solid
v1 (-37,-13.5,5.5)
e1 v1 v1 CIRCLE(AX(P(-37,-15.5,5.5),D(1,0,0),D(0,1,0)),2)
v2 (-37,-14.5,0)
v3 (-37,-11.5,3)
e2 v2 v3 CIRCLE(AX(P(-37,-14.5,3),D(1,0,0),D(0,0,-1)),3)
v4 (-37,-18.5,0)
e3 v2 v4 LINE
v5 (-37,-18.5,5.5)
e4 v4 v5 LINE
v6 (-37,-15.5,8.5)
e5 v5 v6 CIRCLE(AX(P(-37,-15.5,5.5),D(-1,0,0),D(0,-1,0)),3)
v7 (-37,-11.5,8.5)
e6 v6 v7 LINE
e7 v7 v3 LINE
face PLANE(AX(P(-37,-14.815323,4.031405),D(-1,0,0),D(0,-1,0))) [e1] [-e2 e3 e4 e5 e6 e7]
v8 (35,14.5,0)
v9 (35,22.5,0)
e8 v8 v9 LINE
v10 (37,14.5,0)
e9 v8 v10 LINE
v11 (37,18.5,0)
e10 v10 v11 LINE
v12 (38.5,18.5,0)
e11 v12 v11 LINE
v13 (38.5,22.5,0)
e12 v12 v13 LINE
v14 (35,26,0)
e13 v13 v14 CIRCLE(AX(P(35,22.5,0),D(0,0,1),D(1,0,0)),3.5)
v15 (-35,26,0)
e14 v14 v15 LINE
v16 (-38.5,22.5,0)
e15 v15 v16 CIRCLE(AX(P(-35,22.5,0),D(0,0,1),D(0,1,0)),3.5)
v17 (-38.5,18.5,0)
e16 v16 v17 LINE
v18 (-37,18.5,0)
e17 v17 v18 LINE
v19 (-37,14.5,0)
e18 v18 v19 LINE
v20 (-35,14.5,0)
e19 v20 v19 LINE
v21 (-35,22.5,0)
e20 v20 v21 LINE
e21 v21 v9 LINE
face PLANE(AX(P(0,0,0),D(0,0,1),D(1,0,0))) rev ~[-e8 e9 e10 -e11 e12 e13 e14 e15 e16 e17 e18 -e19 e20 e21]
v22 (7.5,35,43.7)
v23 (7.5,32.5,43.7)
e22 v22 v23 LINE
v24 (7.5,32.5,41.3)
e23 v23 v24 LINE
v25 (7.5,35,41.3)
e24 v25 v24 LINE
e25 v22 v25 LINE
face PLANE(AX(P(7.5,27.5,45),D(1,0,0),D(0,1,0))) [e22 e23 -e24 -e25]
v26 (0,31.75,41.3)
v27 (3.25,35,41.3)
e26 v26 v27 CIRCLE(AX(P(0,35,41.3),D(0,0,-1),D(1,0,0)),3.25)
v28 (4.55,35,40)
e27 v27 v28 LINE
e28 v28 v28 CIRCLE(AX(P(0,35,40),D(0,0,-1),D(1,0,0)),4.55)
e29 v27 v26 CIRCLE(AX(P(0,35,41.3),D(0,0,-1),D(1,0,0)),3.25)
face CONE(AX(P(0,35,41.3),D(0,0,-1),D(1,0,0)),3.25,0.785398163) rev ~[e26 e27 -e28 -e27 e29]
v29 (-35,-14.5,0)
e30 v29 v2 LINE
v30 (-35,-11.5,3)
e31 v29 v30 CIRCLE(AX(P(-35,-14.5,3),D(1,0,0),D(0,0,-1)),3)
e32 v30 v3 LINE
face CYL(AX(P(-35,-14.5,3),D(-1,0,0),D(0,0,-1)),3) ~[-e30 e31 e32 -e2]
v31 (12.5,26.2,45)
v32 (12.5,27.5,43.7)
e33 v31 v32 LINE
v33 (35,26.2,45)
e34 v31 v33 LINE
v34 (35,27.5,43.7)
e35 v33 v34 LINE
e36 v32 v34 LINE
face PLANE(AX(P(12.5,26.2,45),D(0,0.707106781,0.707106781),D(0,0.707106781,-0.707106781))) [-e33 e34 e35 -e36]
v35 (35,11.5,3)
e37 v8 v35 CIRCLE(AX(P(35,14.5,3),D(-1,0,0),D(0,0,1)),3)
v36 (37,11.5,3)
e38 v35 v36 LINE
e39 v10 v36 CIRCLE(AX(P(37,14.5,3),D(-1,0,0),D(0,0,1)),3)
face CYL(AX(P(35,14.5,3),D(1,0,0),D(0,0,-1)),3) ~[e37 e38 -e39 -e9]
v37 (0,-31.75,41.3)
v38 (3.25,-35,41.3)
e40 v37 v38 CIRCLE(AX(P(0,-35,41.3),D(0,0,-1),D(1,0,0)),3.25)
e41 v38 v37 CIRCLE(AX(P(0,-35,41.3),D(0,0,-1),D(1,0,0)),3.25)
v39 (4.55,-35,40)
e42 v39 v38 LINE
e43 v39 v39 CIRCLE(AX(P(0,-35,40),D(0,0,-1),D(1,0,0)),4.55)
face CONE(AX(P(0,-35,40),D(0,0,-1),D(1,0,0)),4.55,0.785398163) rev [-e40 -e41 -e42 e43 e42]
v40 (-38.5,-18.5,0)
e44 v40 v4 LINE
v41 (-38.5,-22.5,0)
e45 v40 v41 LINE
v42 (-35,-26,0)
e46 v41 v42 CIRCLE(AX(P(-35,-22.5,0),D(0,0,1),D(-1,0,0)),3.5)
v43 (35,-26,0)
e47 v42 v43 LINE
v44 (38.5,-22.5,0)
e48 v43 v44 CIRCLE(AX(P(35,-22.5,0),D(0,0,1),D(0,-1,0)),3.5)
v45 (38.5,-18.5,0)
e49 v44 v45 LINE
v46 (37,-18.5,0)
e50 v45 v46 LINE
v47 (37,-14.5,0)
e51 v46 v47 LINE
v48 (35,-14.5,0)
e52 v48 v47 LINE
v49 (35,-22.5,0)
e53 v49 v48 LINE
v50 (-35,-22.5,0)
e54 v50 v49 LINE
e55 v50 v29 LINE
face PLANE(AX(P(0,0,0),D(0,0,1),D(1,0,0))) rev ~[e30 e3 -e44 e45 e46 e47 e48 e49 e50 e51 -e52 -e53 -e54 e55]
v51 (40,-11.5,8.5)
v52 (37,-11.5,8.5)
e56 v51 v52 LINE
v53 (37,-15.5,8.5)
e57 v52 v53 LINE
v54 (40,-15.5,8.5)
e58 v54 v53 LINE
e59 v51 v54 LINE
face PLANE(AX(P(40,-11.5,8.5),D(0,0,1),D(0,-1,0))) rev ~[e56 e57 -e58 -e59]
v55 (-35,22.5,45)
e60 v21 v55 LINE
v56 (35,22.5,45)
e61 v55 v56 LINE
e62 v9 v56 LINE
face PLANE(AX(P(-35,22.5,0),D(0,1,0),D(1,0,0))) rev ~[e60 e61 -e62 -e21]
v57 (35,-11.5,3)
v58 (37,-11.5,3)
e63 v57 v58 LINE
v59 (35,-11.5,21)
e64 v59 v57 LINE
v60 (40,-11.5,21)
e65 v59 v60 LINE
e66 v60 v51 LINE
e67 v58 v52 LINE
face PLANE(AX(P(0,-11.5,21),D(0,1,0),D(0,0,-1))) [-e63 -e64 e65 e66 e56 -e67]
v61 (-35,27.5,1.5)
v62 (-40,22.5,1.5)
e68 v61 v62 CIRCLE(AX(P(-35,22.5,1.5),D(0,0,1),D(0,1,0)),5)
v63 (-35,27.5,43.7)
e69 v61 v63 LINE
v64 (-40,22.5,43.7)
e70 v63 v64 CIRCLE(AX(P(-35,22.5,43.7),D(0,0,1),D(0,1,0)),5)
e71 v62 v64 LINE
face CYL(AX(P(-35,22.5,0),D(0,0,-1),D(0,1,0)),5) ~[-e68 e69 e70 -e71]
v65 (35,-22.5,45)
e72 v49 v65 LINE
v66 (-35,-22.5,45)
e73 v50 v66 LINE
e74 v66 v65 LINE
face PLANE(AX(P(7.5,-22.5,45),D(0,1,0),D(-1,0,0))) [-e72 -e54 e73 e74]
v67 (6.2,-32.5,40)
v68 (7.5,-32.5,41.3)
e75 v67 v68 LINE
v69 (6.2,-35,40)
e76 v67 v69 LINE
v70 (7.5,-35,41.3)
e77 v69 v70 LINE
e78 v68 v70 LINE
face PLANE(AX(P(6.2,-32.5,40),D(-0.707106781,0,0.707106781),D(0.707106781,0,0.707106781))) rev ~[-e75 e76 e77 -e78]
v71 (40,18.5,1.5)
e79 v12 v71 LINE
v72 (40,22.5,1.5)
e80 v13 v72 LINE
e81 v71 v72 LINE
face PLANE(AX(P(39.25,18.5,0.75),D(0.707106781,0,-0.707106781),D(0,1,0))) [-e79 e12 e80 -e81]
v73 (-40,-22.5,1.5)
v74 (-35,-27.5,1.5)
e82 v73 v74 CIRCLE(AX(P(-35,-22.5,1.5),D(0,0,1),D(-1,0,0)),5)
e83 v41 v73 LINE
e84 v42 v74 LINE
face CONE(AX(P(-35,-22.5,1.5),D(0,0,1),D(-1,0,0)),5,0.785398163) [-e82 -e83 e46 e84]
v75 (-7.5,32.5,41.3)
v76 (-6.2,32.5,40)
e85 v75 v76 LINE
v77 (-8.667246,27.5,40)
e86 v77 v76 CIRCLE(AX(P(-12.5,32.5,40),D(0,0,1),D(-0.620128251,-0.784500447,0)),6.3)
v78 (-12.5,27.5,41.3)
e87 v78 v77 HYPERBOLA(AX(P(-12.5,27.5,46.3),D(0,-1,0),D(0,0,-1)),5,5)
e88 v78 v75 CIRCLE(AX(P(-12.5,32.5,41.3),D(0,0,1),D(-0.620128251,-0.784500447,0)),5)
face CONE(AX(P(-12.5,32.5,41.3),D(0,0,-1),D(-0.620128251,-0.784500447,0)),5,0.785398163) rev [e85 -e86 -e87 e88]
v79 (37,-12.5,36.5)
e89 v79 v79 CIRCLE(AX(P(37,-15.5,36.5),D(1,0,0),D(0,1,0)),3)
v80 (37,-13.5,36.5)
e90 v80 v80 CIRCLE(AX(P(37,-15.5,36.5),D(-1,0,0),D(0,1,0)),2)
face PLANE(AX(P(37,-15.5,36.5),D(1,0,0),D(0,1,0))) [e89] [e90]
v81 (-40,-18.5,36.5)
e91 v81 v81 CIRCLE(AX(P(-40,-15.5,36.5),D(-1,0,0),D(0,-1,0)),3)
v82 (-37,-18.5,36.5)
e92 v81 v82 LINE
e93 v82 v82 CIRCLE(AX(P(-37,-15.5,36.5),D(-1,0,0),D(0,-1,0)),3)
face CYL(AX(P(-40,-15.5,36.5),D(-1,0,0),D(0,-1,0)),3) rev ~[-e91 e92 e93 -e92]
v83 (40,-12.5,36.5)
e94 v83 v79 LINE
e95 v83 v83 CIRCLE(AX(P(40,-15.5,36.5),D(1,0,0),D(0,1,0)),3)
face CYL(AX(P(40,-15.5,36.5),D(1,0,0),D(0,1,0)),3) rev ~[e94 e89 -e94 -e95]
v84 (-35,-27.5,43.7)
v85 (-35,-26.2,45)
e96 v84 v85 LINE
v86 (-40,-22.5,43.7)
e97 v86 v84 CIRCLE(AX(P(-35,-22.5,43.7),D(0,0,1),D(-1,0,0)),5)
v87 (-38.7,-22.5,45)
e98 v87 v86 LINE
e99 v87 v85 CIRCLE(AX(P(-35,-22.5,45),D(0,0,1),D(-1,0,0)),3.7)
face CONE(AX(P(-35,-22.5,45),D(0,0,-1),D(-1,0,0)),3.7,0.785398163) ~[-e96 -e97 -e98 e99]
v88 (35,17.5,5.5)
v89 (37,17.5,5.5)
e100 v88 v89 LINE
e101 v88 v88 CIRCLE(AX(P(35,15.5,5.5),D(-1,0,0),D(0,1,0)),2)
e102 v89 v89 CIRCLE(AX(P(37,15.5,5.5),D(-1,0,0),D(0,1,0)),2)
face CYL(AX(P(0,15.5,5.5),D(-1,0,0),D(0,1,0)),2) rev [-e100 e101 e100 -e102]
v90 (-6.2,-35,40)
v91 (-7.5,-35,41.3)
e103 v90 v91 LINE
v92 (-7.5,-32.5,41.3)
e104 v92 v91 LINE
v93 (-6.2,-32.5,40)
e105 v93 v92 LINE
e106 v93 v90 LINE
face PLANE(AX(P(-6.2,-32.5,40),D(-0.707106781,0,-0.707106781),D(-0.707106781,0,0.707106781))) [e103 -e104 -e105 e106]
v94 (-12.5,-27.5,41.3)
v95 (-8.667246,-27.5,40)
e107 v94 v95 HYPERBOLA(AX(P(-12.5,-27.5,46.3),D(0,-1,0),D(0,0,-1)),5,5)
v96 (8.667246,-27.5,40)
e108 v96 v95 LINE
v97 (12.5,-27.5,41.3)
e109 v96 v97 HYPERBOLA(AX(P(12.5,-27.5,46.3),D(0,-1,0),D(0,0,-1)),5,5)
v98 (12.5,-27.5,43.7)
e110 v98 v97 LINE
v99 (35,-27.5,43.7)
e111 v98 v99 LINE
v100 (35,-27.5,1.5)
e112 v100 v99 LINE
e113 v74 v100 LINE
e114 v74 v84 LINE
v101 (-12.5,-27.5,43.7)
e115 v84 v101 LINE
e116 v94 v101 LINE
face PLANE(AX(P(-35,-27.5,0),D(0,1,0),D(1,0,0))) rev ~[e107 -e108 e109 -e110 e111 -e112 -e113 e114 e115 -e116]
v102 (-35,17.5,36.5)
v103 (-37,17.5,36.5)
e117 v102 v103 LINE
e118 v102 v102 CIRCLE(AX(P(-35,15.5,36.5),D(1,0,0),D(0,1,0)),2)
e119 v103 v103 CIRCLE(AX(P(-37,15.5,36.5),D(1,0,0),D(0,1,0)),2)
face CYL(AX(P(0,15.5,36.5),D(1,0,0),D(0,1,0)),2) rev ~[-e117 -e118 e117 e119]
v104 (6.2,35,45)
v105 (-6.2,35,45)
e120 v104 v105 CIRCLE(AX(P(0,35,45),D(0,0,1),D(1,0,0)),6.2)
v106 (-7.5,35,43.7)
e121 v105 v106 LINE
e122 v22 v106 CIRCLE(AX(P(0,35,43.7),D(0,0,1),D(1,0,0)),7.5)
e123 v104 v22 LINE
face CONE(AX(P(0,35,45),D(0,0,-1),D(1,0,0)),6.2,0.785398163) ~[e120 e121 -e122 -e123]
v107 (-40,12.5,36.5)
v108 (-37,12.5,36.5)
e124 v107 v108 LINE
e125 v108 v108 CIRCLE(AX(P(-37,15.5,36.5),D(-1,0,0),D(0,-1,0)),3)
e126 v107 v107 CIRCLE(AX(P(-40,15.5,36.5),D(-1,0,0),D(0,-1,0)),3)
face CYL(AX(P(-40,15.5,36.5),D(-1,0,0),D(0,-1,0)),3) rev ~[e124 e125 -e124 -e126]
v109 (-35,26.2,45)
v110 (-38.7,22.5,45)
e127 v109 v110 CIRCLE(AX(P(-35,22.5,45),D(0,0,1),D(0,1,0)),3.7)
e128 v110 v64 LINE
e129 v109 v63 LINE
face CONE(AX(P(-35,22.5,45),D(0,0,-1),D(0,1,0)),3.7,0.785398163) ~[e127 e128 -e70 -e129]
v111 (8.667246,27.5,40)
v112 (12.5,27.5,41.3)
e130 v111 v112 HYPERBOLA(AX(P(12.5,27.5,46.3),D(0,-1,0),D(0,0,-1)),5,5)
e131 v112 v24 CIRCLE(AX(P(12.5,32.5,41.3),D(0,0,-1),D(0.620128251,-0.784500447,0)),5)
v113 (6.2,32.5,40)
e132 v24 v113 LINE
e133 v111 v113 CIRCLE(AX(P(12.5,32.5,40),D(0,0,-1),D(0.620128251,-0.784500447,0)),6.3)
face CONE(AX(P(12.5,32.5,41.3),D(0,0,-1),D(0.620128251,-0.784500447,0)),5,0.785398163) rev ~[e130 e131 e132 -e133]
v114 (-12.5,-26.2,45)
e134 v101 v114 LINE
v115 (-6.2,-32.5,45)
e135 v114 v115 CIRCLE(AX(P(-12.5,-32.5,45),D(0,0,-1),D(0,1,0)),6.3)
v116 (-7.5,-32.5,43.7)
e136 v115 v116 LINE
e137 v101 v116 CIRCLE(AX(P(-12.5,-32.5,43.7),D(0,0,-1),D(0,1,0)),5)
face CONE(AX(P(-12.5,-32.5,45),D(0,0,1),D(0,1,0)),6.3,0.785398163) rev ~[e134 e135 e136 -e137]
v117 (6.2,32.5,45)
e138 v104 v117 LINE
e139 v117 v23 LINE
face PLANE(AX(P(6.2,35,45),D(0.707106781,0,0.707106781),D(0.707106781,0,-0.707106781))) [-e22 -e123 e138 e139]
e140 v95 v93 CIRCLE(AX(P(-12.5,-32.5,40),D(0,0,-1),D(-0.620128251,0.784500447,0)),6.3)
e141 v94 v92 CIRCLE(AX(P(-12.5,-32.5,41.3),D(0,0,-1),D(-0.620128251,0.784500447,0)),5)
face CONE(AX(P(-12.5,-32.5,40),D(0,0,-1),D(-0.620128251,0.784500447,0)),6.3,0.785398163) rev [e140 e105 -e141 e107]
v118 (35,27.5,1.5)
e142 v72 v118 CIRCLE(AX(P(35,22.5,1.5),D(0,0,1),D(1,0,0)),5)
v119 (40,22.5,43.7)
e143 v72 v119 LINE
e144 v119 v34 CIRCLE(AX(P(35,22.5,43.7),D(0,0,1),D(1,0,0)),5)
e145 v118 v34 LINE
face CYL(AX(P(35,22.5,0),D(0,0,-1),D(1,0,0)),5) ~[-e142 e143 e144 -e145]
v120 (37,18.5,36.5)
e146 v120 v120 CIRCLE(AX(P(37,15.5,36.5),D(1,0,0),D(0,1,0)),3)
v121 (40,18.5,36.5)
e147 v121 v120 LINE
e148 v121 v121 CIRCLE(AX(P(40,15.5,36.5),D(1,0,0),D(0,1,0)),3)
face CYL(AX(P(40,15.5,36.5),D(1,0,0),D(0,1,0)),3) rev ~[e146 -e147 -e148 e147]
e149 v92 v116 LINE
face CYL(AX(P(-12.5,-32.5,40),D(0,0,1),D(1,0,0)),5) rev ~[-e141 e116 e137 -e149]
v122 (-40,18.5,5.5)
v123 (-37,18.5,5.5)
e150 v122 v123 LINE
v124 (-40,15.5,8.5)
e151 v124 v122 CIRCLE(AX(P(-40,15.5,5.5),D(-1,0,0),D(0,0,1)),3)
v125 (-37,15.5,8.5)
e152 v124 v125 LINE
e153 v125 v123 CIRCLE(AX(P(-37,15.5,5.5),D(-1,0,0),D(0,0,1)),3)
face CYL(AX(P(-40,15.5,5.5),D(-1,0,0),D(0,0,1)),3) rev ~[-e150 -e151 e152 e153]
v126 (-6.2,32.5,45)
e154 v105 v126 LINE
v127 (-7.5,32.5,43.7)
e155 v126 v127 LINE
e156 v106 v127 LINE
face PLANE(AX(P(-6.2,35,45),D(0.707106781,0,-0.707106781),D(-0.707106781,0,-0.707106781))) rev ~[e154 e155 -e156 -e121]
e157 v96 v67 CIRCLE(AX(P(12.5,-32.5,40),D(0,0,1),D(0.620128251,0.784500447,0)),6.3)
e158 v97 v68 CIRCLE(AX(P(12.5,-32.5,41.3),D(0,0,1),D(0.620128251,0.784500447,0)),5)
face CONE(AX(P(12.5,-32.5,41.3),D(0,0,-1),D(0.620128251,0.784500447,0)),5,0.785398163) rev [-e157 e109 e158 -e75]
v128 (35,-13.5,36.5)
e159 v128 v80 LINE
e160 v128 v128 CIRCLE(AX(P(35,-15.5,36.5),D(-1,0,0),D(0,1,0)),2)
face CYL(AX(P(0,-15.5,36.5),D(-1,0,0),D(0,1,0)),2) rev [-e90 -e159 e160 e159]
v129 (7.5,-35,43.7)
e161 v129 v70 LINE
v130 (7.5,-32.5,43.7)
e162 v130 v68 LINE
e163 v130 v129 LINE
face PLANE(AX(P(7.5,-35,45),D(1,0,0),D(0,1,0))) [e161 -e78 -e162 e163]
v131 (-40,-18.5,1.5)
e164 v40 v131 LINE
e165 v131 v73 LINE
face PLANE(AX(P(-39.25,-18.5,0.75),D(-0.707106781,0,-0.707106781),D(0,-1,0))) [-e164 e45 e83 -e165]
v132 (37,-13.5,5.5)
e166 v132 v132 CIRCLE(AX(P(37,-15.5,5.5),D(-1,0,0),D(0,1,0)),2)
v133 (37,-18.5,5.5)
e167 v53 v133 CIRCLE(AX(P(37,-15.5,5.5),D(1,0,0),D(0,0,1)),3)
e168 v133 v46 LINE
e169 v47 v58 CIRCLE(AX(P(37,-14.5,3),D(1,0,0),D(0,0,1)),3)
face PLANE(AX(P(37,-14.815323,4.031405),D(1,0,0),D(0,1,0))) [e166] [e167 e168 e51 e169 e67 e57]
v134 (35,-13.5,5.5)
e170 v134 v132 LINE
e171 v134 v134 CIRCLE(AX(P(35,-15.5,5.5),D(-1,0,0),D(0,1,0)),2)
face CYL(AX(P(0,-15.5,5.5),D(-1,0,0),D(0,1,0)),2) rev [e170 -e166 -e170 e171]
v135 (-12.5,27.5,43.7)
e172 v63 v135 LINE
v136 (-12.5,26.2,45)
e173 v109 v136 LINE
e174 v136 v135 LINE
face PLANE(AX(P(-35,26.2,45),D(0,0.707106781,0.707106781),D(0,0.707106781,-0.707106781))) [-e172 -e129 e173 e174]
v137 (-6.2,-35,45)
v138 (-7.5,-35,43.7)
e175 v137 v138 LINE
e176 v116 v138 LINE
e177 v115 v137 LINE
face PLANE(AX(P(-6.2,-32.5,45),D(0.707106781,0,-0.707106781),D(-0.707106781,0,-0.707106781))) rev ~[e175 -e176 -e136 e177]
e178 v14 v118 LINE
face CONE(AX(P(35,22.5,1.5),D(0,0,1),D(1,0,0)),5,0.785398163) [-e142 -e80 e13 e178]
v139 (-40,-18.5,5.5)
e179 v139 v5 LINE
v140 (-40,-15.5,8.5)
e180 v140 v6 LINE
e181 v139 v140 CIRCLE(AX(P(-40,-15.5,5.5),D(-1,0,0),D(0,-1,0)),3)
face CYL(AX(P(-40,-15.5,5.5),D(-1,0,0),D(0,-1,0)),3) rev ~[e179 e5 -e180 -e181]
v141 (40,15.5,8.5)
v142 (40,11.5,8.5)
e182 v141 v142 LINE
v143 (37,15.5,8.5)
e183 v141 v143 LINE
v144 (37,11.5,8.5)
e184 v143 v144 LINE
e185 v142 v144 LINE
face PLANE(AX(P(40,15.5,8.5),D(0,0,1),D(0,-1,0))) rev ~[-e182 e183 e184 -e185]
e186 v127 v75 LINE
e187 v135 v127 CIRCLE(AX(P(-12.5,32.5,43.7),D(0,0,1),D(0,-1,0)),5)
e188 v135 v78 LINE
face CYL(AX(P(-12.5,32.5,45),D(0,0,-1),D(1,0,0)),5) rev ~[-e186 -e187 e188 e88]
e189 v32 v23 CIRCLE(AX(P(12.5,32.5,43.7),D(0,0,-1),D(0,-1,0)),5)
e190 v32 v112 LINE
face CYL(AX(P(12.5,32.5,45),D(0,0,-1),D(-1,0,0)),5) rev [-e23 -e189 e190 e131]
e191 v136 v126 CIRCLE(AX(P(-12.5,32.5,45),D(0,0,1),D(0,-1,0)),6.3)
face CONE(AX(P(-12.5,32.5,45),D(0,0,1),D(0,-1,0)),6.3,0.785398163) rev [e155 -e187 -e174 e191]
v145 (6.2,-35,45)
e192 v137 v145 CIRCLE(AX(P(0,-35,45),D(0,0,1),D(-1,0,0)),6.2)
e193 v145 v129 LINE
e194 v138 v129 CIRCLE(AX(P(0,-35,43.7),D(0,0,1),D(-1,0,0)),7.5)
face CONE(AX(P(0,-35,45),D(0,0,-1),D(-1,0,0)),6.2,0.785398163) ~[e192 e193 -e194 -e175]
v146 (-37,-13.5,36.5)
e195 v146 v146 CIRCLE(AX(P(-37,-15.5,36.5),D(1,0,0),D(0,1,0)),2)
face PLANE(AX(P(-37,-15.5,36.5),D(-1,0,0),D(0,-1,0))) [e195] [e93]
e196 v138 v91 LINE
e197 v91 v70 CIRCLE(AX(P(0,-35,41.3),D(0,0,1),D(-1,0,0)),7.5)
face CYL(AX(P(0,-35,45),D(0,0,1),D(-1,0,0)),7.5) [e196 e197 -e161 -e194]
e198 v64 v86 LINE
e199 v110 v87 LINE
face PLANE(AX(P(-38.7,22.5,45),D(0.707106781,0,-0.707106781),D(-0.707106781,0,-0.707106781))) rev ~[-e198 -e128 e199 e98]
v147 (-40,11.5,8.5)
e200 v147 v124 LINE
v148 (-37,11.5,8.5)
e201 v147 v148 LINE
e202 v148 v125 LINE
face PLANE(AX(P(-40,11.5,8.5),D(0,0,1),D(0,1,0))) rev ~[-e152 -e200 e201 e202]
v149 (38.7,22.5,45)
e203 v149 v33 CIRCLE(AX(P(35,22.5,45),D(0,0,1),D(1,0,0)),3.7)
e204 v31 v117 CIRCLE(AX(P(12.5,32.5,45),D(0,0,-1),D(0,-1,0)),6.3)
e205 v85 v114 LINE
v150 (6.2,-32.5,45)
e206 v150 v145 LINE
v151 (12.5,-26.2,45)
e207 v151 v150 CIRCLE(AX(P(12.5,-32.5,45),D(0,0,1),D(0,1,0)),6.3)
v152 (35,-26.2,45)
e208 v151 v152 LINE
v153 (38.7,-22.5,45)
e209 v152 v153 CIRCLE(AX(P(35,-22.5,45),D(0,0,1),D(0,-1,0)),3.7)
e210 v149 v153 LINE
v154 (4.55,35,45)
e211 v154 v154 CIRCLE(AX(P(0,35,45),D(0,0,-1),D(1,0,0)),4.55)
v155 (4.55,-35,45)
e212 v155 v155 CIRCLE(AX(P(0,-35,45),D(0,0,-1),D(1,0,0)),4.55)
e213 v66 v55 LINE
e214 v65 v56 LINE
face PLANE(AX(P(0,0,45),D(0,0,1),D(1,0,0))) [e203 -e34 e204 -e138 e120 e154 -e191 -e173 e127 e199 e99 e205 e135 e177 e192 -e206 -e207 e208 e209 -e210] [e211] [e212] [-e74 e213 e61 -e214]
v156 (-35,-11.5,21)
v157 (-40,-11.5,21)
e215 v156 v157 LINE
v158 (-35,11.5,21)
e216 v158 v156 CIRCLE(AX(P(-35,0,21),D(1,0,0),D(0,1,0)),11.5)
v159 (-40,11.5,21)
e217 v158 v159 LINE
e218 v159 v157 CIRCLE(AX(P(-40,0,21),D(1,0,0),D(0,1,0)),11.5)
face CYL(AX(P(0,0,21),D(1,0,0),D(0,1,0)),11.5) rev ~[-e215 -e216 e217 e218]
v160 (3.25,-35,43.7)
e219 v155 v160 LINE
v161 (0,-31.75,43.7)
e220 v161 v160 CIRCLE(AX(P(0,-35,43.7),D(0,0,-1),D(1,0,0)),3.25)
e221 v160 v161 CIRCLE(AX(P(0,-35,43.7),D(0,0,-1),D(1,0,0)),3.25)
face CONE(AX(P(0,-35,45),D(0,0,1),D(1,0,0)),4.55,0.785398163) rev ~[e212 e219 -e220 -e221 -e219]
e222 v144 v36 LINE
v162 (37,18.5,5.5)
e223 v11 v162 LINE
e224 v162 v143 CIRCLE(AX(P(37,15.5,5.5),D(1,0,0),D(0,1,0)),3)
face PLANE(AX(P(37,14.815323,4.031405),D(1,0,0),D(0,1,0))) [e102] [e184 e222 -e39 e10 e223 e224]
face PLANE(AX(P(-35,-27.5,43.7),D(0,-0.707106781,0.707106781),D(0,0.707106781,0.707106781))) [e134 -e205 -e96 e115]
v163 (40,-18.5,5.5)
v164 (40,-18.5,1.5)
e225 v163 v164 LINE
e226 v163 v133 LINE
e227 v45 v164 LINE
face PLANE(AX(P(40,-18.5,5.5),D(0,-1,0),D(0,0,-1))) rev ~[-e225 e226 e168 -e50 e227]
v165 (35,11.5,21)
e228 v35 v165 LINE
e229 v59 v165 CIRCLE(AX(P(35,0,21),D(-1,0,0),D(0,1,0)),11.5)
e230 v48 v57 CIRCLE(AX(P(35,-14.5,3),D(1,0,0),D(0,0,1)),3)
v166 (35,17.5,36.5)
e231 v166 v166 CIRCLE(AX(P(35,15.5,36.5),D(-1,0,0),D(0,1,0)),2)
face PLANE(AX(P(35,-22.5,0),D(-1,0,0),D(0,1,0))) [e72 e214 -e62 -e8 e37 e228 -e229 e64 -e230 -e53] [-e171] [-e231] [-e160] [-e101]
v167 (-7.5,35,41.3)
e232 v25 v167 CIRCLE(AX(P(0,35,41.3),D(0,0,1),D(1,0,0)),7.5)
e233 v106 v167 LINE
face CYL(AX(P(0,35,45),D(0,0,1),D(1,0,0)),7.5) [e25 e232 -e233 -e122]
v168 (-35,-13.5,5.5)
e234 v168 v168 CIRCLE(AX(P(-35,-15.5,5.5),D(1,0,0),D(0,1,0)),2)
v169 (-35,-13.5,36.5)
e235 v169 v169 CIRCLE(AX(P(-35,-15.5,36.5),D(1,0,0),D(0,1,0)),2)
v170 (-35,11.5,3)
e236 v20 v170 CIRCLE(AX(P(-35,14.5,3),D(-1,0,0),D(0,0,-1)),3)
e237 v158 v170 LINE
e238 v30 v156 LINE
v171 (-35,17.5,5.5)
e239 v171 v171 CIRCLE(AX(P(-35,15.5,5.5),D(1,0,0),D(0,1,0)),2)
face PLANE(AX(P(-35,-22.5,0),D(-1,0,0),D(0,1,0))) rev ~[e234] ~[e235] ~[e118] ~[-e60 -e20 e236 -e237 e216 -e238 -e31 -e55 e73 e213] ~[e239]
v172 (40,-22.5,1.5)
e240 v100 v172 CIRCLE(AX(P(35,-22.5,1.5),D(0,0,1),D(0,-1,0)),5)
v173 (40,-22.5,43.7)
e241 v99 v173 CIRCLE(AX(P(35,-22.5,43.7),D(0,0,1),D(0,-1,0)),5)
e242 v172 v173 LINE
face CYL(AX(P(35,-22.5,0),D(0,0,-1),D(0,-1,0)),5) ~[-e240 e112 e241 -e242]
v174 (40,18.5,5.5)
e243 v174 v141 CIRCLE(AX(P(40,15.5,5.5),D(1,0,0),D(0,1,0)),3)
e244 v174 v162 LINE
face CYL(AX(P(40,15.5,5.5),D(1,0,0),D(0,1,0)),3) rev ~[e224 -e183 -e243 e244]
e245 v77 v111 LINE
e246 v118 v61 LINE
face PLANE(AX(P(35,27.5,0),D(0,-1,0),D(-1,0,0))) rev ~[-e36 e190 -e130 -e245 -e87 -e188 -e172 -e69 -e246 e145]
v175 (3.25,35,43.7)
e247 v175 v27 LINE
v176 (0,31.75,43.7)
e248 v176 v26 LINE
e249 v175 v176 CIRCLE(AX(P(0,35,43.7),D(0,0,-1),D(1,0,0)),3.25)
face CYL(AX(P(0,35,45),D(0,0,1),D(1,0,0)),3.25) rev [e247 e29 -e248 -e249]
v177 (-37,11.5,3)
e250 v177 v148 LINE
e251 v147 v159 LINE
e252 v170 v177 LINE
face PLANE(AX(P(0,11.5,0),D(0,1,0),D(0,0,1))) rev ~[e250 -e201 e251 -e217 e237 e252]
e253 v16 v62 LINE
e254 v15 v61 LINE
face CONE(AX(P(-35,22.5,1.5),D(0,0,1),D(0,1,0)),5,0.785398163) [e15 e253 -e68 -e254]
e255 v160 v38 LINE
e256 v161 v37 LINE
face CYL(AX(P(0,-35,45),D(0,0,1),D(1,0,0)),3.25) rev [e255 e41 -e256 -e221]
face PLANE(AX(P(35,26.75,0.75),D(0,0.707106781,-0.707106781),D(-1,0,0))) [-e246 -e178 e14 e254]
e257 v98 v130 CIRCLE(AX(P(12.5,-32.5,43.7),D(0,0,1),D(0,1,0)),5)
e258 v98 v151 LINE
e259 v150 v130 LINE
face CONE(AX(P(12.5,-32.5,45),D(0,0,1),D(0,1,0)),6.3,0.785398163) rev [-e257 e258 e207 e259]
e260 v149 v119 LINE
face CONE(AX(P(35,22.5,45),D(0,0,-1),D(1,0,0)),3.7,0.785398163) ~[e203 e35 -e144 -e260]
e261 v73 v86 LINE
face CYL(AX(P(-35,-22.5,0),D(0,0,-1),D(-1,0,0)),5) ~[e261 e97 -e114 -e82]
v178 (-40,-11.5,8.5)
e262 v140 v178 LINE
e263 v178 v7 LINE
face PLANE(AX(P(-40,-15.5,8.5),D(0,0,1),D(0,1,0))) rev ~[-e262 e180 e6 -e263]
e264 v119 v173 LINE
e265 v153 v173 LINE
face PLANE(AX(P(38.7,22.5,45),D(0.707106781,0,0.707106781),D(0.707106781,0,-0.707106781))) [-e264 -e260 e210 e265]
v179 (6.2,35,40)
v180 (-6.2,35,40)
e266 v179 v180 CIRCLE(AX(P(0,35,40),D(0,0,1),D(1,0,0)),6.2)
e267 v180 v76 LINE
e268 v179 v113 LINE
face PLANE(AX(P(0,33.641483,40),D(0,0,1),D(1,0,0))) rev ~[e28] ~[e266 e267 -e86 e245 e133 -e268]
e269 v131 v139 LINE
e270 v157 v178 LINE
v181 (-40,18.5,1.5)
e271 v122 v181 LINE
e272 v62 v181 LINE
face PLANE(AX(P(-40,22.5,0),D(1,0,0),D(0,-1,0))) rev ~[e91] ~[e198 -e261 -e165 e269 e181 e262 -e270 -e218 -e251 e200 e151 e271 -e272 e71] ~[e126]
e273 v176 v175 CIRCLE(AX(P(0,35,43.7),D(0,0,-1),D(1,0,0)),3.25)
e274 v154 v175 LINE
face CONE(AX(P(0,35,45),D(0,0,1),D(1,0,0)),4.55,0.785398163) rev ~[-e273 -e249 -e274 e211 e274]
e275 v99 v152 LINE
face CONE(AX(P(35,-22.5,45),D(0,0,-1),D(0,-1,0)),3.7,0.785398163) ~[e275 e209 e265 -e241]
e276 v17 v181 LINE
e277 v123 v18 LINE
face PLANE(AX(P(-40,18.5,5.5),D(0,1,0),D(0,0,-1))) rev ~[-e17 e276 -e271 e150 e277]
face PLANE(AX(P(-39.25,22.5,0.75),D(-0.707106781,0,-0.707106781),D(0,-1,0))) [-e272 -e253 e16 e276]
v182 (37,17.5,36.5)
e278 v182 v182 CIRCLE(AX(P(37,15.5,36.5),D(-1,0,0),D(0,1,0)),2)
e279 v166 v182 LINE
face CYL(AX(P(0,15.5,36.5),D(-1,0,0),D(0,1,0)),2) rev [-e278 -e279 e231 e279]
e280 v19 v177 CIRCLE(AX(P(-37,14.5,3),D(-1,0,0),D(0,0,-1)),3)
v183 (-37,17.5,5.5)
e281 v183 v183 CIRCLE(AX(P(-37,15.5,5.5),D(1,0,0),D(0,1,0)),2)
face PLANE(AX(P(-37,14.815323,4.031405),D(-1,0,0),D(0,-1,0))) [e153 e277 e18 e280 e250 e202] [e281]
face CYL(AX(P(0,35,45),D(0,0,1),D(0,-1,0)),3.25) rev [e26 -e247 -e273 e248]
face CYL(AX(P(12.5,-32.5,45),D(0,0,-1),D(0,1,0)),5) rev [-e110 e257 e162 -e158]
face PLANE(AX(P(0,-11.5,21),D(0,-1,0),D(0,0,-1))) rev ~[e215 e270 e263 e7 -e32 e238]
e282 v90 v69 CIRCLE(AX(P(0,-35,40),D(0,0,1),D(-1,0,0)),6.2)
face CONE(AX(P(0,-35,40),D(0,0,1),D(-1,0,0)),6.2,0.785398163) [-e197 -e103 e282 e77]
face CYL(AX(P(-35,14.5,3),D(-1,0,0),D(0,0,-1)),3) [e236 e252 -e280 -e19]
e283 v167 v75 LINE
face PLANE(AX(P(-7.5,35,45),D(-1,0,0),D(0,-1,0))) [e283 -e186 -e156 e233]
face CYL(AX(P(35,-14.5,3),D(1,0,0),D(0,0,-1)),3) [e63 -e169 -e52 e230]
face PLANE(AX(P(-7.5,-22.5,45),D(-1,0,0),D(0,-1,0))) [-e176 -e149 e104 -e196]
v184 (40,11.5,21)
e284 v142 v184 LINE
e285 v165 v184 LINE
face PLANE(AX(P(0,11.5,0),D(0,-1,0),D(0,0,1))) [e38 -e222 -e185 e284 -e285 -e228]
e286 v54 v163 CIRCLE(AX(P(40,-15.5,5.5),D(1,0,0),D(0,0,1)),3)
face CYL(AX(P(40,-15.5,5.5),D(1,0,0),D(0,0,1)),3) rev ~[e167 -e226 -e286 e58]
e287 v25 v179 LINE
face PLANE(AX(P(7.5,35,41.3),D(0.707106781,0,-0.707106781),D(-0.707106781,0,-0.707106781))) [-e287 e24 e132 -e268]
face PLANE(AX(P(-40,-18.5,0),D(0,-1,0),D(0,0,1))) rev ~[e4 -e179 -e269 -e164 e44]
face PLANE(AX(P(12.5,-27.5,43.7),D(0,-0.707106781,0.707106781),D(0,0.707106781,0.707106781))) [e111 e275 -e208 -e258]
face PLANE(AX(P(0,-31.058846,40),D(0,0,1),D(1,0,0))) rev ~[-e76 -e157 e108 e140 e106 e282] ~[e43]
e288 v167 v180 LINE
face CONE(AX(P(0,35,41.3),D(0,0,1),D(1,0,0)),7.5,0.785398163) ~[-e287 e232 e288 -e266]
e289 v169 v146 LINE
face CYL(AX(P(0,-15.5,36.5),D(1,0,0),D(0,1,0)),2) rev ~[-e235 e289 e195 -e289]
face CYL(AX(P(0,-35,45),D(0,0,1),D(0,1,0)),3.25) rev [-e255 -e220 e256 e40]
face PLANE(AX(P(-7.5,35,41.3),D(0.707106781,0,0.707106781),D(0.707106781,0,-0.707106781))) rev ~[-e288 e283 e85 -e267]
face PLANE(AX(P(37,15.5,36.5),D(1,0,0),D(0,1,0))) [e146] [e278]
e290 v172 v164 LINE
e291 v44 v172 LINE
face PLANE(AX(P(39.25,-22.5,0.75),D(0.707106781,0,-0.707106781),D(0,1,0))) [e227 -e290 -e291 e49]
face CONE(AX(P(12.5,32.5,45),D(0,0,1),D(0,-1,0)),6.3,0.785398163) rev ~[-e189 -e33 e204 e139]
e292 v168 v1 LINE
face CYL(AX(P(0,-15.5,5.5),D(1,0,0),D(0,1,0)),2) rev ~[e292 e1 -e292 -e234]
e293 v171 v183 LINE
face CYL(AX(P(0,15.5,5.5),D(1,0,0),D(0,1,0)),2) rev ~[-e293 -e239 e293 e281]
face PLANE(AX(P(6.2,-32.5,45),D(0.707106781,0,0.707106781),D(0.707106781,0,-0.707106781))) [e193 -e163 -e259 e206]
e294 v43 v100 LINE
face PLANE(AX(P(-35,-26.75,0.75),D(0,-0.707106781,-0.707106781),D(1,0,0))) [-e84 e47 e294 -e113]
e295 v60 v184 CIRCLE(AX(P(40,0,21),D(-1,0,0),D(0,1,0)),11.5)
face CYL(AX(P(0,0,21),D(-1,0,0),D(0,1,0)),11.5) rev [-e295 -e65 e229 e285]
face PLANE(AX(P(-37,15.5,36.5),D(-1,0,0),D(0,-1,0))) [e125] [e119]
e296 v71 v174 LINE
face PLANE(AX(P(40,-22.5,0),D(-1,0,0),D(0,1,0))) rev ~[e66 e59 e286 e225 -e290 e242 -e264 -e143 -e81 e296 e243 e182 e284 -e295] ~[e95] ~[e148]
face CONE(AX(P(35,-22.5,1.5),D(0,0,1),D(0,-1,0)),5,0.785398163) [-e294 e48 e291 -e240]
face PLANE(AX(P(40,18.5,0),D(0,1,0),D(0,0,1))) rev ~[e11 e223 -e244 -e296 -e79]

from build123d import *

# Parameters (mm, degrees)
F0_W          = 70
F0_H          = 45
F1_DEPTH      = 45
F2_R          = 2
F3_DEPTH      = 40.001
F3_DEPTH_BACK = 40.001
F5_R          = 3
F6_DEPTH      = 3
F7_R          = 3
F8_DEPTH      = 3
F9_R          = 3
F10_SIZE      = 1.5
F12_DEPTH     = 5
F13_R         = 5
F14_T1_DEPTH  = 22.5
F14_T3_DEPTH  = 22.5
F14_T5_DEPTH  = 2.5
F14_T7_DEPTH  = 45
F14_T9_DEPTH  = 2.5
F14_T16_ANGLE = 180
F14_T22_ANGLE = 128.3255006626
F14_T27_ANGLE = 90
F14_T29_ANGLE = 90
F14_T31_ANGLE = 180
F14_T33_ANGLE = 90
F14_T35_ANGLE = 90
F14_T37_ANGLE = 90
F14_T39_ANGLE = 90
F14_T41_ANGLE = 180
F14_T43_ANGLE = 90
F14_T45_ANGLE = 90
F14_T49_ANGLE = 128.3255006626
F14_T52_ANGLE = 180
F14_T56_ANGLE = 128.3255006626
F14_T61_ANGLE = 128.3255006626


# Not quite as in the source:
# - a fillet or chamfer that OpenCascade refuses, or shapes differently, is made with other operations: its cross-section is extruded or revolved along the edge and cut away or added


with BuildPart() as f1:
    # F0 (on Top) → F1 (new body)
    with BuildSketch(Plane.XY):
        with BuildLine():
            ThreePointArc((40, 22.5), (38.5355339059, 26.0355339059), (35, 27.5))
            Line((35, 27.5), (-35, 27.5))
            ThreePointArc((-35, 27.5), (-38.5355339059, 26.0355339059), (-40, 22.5))
            Line((-40, 22.5), (-40, -22.5))
            ThreePointArc((-40, -22.5), (-38.5355339059, -26.0355339059), (-35, -27.5))
            Line((-35, -27.5), (35, -27.5))
            ThreePointArc((35, -27.5), (38.5355339059, -26.0355339059), (40, -22.5))
            Line((40, -22.5), (40, 22.5))
        make_face()
        Rectangle(F0_W, F0_H, mode=Mode.SUBTRACT)
    extrude(amount=F1_DEPTH)

    # F2 (on Right) → F3 (cut, two sides)
    with BuildSketch(Plane.YZ) as f3_sk:
        with Locations((15.5, 36.5)):
            Circle(F2_R)
        with Locations((-15.5, 36.5)):
            Circle(F2_R)
        with Locations((15.5, 5.5)):
            Circle(F2_R)
        with Locations((-15.5, 5.5)):
            Circle(F2_R)
        with BuildLine():
            Line((11.5, 0), (11.5, 21))
            ThreePointArc((11.5, 21), (0, 32.5), (-11.5, 21))
            Line((-11.5, 21), (-11.5, 0))
            Line((-11.5, 0), (11.5, 0))
        make_face()
    extrude(amount=-F3_DEPTH, mode=Mode.SUBTRACT)
    extrude(f3_sk.sketch, amount=F3_DEPTH_BACK, mode=Mode.SUBTRACT)

    # F5 (on face) → F6 (cut)
    with BuildSketch(Plane.YZ.offset(40)):
        with Locations((-15.5, 36.5)):
            Circle(F5_R)
        with Locations((15.5, 36.5)):
            Circle(F5_R)
        with BuildLine():
            ThreePointArc((-15.5, 8.5), (-17.6213203436, 7.6213203436), (-18.5, 5.5))
            Line((-18.5, 5.5), (-18.5, 0))
            Line((-18.5, 0), (-11.5, 0))
            Line((-11.5, 0), (-11.5, 8.5))
            Line((-11.5, 8.5), (-15.5, 8.5))
        make_face()
        with BuildLine():
            Line((15.5, 8.5), (11.5, 8.5))
            Line((11.5, 8.5), (11.5, 0))
            Line((11.5, 0), (18.5, 0))
            Line((18.5, 0), (18.5, 5.5))
            ThreePointArc((18.5, 5.5), (17.6213203436, 7.6213203436), (15.5, 8.5))
        make_face()
    extrude(amount=-F6_DEPTH, mode=Mode.SUBTRACT)

    # F7 (on face) → F8 (cut)
    with BuildSketch(Plane(origin=(-40, 0, 0), x_dir=(0, -1, 0), z_dir=(-1, 0, 0))):
        with Locations((-15.5, 36.5)):
            Circle(F7_R)
        with Locations((15.5, 36.5)):
            Circle(F7_R)
        with BuildLine():
            Line((11.5, 0), (18.5, 0))
            Line((18.5, 0), (18.5, 5.5))
            ThreePointArc((18.5, 5.5), (17.6213203436, 7.6213203436), (15.5, 8.5))
            Line((15.5, 8.5), (11.5, 8.5))
            Line((11.5, 8.5), (11.5, 0))
        make_face()
        with BuildLine():
            Line((-11.5, 8.5), (-15.5, 8.5))
            ThreePointArc((-15.5, 8.5), (-17.6213203436, 7.6213203436), (-18.5, 5.5))
            Line((-18.5, 5.5), (-18.5, 0))
            Line((-18.5, 0), (-11.5, 0))
            Line((-11.5, 0), (-11.5, 8.5))
        make_face()
    extrude(amount=-F8_DEPTH, mode=Mode.SUBTRACT)

    # F9
    f9_edges = [f1.edges().sort_by_distance(p)[0] for p in [
        (36, 11.5, 0),
        (-36, 11.5, 0),
        (-36, -11.5, 0),
        (36, -11.5, 0),
    ]]
    fillet(f9_edges, radius=F9_R)

    # F10
    f10_edges = [f1.edges().sort_by_distance(p)[0] for p in [
        (-40, 20.5, 0),
        (-38.535534, -26.035534, 0),
        (-40, -20.5, 0),
        (0, -27.5, 0),
        (38.535534, -26.035534, 0),
        (40, -20.5, 0),
        (40, 20.5, 0),
        (38.535534, 26.035534, 0),
        (0, 27.5, 0),
        (-38.535534, 26.035534, 0),
    ]]
    chamfer(f10_edges, length=F10_SIZE)

    # F11 (on face) → F12 (join)
    with BuildSketch(Plane.XY.offset(45)):
        with BuildLine():
            Line((-7.5, 27.5), (0, 27.5))
            Line((0, 27.5), (7.5, 27.5))
            Line((7.5, 27.5), (7.5, 35))
            ThreePointArc((7.5, 35), (0, 42.5), (-7.5, 35))
            Line((-7.5, 35), (-7.5, 27.5))
        make_face()
        with BuildLine():
            ThreePointArc((0, 31.75), (-2.2980970389, 37.2980970389), (3.25, 35))
            ThreePointArc((3.25, 35), (2.2980970389, 32.7019029611), (0, 31.75))
        make_face(mode=Mode.SUBTRACT)
        with BuildLine():
            Line((7.5, -22.5), (0, -22.5))
            Line((0, -22.5), (-7.5, -22.5))
            Line((-7.5, -22.5), (-7.5, -35))
            ThreePointArc((-7.5, -35), (0, -42.5), (7.5, -35))
            Line((7.5, -35), (7.5, -22.5))
        make_face()
        with BuildLine():
            ThreePointArc((3.25, -35), (-2.2980970389, -37.2980970389), (0, -31.75))
            ThreePointArc((0, -31.75), (2.2980970389, -32.7019029611), (3.25, -35))
        make_face(mode=Mode.SUBTRACT)
    extrude(amount=-F12_DEPTH)

    # F13
    f13_edges = [f1.edges().sort_by_distance(p)[0] for p in [
        (7.5, 27.5, 42.5),
        (-7.5, 27.5, 42.5),
        (-7.5, -27.5, 42.5),
        (7.5, -27.5, 42.5),
    ]]
    fillet(f13_edges, radius=F13_R)

    # F14: chamfer of 1.3 on 34 edges, made by hand

    # F14_s2 → F14_t1 (cut)
    with BuildSketch(Plane.YZ.offset(12.5)):
        Polygon((-27.5, 43.7), (-26.2, 45), (-27.5, 45), align=None)
        Polygon((26.2, 45), (27.5, 43.7), (27.5, 45), align=None)
    extrude(amount=F14_T1_DEPTH, mode=Mode.SUBTRACT)

    # F14_s4 → F14_t3 (cut)
    with BuildSketch(Plane.YZ.offset(-35)):
        Polygon((-27.5, 43.7), (-26.2, 45), (-27.5, 45), align=None)
        Polygon((26.2, 45), (27.5, 43.7), (27.5, 45), align=None)
    extrude(amount=F14_T3_DEPTH, mode=Mode.SUBTRACT)

    # F14_s6 → F14_t5 (cut)
    with BuildSketch(Plane.XZ.offset(32.5)):
        Polygon((6.2, 45), (7.5, 43.7), (7.5, 45), align=None)
        Polygon((-6.2, 45), (-7.5, 43.7), (-7.5, 45), align=None)
        Polygon((-6.2, 40), (-7.5, 41.3), (-7.5, 40), align=None)
        Polygon((6.2, 40), (7.5, 41.3), (7.5, 40), align=None)
    extrude(amount=F14_T5_DEPTH, mode=Mode.SUBTRACT)

    # F14_s8 → F14_t7 (cut)
    with BuildSketch(Plane.XZ.offset(-22.5)):
        Polygon((38.7, 45), (40, 43.7), (40, 45), align=None)
        Polygon((-38.7, 45), (-40, 43.7), (-40, 45), align=None)
    extrude(amount=F14_T7_DEPTH, mode=Mode.SUBTRACT)

    # F14_s10 → F14_t9 (cut)
    with BuildSketch(Plane.XZ.offset(-35)):
        Polygon((6.2, 45), (7.5, 43.7), (7.5, 45), align=None)
        Polygon((-6.2, 45), (-7.5, 43.7), (-7.5, 45), align=None)
        Polygon((7.5, 41.3), (6.2, 40), (7.5, 40), align=None)
        Polygon((-7.5, 41.3), (-6.2, 40), (-7.5, 40), align=None)
    extrude(amount=F14_T9_DEPTH, mode=Mode.SUBTRACT)

    # F14_s11 → F14_t12 (revolve, cut)
    with BuildSketch(Plane.XZ.offset(35)):
        Polygon((4.55, 45), (3.25, 43.7), (3.25, 45), align=None)
    revolve(axis=Axis((0, -35, 45), (0, 0, -1)), mode=Mode.SUBTRACT)

    # F14_s13 → F14_t14 (revolve, cut)
    with BuildSketch(Plane.XZ.offset(-35)):
        Polygon((4.55, 45), (3.25, 43.7), (3.25, 45), align=None)
    revolve(axis=Axis((0, 35, 45), (0, 0, -1)), mode=Mode.SUBTRACT)

    # F14_s15 → F14_t16 (revolve, cut)
    with BuildSketch(Plane.XZ.offset(-35)):
        Polygon((7.5, 41.3), (6.2, 40), (7.5, 40), align=None)
    revolve(axis=Axis((0, 35, 40), (0, 0, 1)), revolution_arc=F14_T16_ANGLE, mode=Mode.SUBTRACT)

    # F14_s17 → F14_t18 (revolve, cut)
    with BuildSketch(Plane.XZ.offset(-35)):
        Polygon((3.25, 41.3), (4.55, 40), (3.25, 40), align=None)
    revolve(axis=Axis((0, 35, 40), (0, 0, -1)), mode=Mode.SUBTRACT)


with BuildPart() as f14_tool20:
    # F14_s21 → F14_t22 (revolve)
    with BuildSketch(Plane(origin=(-23.5039658434, -18.5793051911, 0), x_dir=(0, 0, 1), z_dir=(-0.7845004474, -0.6201282512, 0))):
        Polygon((40, -11.4446614013), (41.3, -12.7446614013), (40, -12.7446614013), align=None)
    revolve(axis=Axis((-12.5, -32.5, 40), (0, 0, -1)), revolution_arc=F14_T22_ANGLE)

    split(bisect_by=Plane.XZ.offset(27.5), keep=Keep.TOP)


with BuildPart() as f1_1:
    add(f1.part)

    # F14_t19: cut F14_tool20
    add(f14_tool20.part, mode=Mode.SUBTRACT)

    # F14_s24 → F14_t25 (revolve, cut)
    with BuildSketch(Plane.XZ.offset(35)):
        Polygon((4.55, 40), (3.25, 41.3), (3.25, 40), align=None)
    revolve(axis=Axis((0, -35, 40), (0, 0, -1)), mode=Mode.SUBTRACT)

    # F14_s26 → F14_t27 (revolve, cut)
    with BuildSketch(Plane.YZ.offset(12.5)):
        Polygon((-26.2, 45), (-27.5, 43.7), (-27.5, 45), align=None)
    revolve(axis=Axis((12.5, -32.5, 45), (0, 0, 1)), revolution_arc=F14_T27_ANGLE, mode=Mode.SUBTRACT)

    # F14_s28 → F14_t29 (revolve, cut)
    with BuildSketch(Plane.YZ.offset(35)):
        Polygon((-26.2, 45), (-27.5, 43.7), (-27.5, 45), align=None)
    revolve(axis=Axis((35, -22.5, 45), (0, 0, 1)), revolution_arc=F14_T29_ANGLE, mode=Mode.SUBTRACT)

    # F14_s30 → F14_t31 (revolve, cut)
    with BuildSketch(Plane.XZ.offset(35)):
        Polygon((-6.2, 45), (-7.5, 43.7), (-7.5, 45), align=None)
    revolve(axis=Axis((0, -35, 45), (0, 0, 1)), revolution_arc=F14_T31_ANGLE, mode=Mode.SUBTRACT)

    # F14_s32 → F14_t33 (revolve, cut)
    with BuildSketch(Plane.XZ.offset(-22.5)):
        Polygon((38.7, 45), (40, 43.7), (40, 45), align=None)
    revolve(axis=Axis((35, 22.5, 45), (0, 0, 1)), revolution_arc=F14_T33_ANGLE, mode=Mode.SUBTRACT)

    # F14_s34 → F14_t35 (revolve, cut)
    with BuildSketch(Plane.YZ.offset(-12.5)):
        Polygon((-26.2, 45), (-27.5, 43.7), (-27.5, 45), align=None)
    revolve(axis=Axis((-12.5, -32.5, 45), (0, 0, -1)), revolution_arc=F14_T35_ANGLE, mode=Mode.SUBTRACT)

    # F14_s36 → F14_t37 (revolve, cut)
    with BuildSketch(Plane.YZ.offset(12.5)):
        Polygon((26.2, 45), (27.5, 43.7), (27.5, 45), align=None)
    revolve(axis=Axis((12.5, 32.5, 45), (0, 0, -1)), revolution_arc=F14_T37_ANGLE, mode=Mode.SUBTRACT)

    # F14_s38 → F14_t39 (revolve, cut)
    with BuildSketch(Plane.XZ.offset(22.5)):
        Polygon((-38.7, 45), (-40, 43.7), (-40, 45), align=None)
    revolve(axis=Axis((-35, -22.5, 45), (0, 0, 1)), revolution_arc=F14_T39_ANGLE, mode=Mode.SUBTRACT)

    # F14_s40 → F14_t41 (revolve, cut)
    with BuildSketch(Plane.XZ.offset(-35)):
        Polygon((6.2, 45), (7.5, 43.7), (7.5, 45), align=None)
    revolve(axis=Axis((0, 35, 45), (0, 0, 1)), revolution_arc=F14_T41_ANGLE, mode=Mode.SUBTRACT)

    # F14_s42 → F14_t43 (revolve, cut)
    with BuildSketch(Plane.YZ.offset(-35)):
        Polygon((26.2, 45), (27.5, 43.7), (27.5, 45), align=None)
    revolve(axis=Axis((-35, 22.5, 45), (0, 0, 1)), revolution_arc=F14_T43_ANGLE, mode=Mode.SUBTRACT)

    # F14_s44 → F14_t45 (revolve, cut)
    with BuildSketch(Plane.YZ.offset(-12.5)):
        Polygon((26.2, 45), (27.5, 43.7), (27.5, 45), align=None)
    revolve(axis=Axis((-12.5, 32.5, 45), (0, 0, 1)), revolution_arc=F14_T45_ANGLE, mode=Mode.SUBTRACT)


with BuildPart() as f14_tool47:
    # F14_s48 → F14_t49 (revolve)
    with BuildSketch(Plane(origin=(23.5039658434, -18.5793051911, 0), x_dir=(0, 0, 1), z_dir=(0.7845004474, -0.6201282512, 0))):
        Polygon((41.3, 12.7446614013), (40, 11.4446614013), (40, 12.7446614013), align=None)
    revolve(axis=Axis((12.5, -32.5, 40), (0, 0, 1)), revolution_arc=F14_T49_ANGLE)

    split(bisect_by=Plane.XZ.offset(27.5), keep=Keep.TOP)


with BuildPart() as f1_2:
    add(f1_1.part)

    # F14_t46: cut F14_tool47
    add(f14_tool47.part, mode=Mode.SUBTRACT)

    # F14_s51 → F14_t52 (revolve, cut)
    with BuildSketch(Plane.XZ.offset(35)):
        Polygon((-6.2, 40), (-7.5, 41.3), (-7.5, 40), align=None)
    revolve(axis=Axis((0, -35, 40), (0, 0, 1)), revolution_arc=F14_T52_ANGLE, mode=Mode.SUBTRACT)


with BuildPart() as f14_tool54:
    # F14_s55 → F14_t56 (revolve)
    with BuildSketch(Plane(origin=(23.5039658434, 18.5793051911, 0), x_dir=(0, 0, 1), z_dir=(0.7845004474, 0.6201282512, 0))):
        Polygon((41.3, -12.7446614013), (40, -11.4446614013), (40, -12.7446614013), align=None)
    revolve(axis=Axis((12.5, 32.5, 40), (0, 0, -1)), revolution_arc=F14_T56_ANGLE)

    split(bisect_by=Plane.XZ.offset(-27.5), keep=Keep.BOTTOM)


with BuildPart() as f1_3:
    add(f1_2.part)

    # F14_t53: cut F14_tool54
    add(f14_tool54.part, mode=Mode.SUBTRACT)


with BuildPart() as f14_tool59:
    # F14_s60 → F14_t61 (revolve)
    with BuildSketch(Plane(origin=(-23.5039658434, 18.5793051911, 0), x_dir=(0, 0, 1), z_dir=(-0.7845004474, 0.6201282512, 0))):
        Polygon((41.3, 12.7446614013), (40, 11.4446614013), (40, 12.7446614013), align=None)
    revolve(axis=Axis((-12.5, 32.5, 40), (0, 0, 1)), revolution_arc=F14_T61_ANGLE)

    split(bisect_by=Plane.XZ.offset(-27.5), keep=Keep.BOTTOM)


with BuildPart() as f1_4:
    add(f1_3.part)

    # F14_t58: cut F14_tool59
    add(f14_tool59.part, mode=Mode.SUBTRACT)


solid = f1_4.part
